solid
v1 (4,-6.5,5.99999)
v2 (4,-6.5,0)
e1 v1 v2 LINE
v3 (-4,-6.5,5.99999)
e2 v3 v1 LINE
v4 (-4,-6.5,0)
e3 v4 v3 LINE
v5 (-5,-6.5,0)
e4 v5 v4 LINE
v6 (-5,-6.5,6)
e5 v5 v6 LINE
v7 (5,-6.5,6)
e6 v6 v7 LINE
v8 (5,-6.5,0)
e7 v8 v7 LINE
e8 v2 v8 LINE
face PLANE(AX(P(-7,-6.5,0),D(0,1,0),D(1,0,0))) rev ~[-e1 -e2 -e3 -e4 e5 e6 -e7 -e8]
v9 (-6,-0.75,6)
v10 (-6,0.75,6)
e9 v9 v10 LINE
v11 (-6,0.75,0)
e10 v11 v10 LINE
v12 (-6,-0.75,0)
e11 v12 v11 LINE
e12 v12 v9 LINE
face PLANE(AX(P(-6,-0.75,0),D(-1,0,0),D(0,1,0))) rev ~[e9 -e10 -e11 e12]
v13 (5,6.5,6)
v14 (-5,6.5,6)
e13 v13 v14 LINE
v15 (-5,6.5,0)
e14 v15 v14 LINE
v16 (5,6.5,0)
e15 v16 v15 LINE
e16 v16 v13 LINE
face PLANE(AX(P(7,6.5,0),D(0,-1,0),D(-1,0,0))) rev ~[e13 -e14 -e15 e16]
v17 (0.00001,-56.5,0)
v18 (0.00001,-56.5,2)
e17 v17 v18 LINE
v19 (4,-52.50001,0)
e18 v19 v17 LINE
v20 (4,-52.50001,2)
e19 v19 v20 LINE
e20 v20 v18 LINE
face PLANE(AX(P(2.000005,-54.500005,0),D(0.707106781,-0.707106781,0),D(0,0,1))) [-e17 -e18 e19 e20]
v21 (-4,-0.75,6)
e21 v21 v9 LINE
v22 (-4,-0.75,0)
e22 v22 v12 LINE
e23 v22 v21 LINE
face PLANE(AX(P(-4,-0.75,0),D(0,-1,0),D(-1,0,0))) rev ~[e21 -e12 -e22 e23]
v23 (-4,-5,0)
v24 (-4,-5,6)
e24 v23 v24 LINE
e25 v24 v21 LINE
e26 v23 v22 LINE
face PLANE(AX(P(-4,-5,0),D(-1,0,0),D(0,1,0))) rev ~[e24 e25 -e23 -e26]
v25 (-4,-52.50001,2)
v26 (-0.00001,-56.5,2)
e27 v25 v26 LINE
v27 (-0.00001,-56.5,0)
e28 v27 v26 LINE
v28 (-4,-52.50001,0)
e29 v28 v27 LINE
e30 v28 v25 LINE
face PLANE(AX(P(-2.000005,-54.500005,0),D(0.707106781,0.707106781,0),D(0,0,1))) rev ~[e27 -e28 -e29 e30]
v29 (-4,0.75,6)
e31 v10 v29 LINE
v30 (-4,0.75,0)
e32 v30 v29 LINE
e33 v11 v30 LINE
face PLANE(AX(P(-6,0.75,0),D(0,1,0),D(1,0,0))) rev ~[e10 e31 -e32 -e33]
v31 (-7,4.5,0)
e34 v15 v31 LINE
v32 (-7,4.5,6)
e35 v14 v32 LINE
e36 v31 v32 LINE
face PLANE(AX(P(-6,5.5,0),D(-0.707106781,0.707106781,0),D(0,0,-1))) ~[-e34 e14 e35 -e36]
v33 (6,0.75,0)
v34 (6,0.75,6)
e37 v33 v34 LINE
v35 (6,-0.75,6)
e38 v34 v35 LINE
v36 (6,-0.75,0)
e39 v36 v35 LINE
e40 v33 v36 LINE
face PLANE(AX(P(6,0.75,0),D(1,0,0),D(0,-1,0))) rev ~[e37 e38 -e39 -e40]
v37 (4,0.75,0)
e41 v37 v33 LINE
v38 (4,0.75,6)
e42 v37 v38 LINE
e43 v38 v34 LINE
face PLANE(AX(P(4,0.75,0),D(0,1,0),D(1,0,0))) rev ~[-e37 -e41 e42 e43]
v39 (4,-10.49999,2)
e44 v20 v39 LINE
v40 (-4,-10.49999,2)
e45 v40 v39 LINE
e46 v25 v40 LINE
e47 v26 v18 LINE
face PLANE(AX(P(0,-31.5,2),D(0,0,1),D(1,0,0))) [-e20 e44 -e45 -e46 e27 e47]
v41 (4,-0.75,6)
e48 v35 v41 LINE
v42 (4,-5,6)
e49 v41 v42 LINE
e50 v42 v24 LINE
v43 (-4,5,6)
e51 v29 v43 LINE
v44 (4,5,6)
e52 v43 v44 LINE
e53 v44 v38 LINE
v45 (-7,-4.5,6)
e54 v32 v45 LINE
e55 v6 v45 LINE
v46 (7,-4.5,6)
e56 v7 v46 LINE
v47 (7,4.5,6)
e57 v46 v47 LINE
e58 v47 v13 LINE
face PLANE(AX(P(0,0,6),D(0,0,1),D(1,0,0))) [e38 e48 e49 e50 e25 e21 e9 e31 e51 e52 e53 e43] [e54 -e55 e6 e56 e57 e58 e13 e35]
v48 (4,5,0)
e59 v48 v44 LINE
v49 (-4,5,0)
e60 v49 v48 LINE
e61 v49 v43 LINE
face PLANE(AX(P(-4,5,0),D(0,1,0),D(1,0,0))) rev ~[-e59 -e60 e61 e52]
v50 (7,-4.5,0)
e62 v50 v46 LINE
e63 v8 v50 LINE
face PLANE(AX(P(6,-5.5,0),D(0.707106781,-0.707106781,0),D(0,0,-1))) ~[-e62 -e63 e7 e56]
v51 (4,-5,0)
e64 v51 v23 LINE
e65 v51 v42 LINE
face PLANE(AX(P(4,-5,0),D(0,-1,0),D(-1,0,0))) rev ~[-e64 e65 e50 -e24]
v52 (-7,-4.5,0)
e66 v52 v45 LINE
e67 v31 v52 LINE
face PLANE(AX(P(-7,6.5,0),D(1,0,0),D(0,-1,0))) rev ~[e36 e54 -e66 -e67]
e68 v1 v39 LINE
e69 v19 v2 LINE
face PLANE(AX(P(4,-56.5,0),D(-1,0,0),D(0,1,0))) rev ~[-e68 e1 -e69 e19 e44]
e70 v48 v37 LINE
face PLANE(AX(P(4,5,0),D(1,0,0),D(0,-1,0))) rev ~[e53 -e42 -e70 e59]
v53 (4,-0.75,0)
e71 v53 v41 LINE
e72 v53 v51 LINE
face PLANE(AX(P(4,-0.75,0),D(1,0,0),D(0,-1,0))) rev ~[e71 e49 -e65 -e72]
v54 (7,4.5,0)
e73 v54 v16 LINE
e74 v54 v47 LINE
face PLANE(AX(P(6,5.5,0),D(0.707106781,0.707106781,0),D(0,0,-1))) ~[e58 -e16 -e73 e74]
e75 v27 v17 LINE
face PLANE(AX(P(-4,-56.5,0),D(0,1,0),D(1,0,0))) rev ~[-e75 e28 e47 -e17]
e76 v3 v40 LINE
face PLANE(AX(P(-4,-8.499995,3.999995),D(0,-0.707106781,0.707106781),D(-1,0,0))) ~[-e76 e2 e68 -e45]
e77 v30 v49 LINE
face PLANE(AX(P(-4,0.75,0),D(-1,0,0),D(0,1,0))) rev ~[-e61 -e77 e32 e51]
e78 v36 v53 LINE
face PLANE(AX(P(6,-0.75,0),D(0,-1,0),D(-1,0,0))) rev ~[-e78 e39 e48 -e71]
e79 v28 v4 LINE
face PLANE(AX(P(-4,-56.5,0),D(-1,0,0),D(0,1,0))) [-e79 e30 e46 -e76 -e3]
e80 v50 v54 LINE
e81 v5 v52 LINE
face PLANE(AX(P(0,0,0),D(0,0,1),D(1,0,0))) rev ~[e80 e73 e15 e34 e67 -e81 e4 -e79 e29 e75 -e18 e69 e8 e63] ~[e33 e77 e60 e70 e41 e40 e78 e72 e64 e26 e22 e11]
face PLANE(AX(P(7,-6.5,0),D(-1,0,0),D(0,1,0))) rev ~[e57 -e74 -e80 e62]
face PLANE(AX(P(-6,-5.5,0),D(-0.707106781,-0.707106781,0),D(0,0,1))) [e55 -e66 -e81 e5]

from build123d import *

# Parameters (mm, degrees)
F1_DEPTH = 6
F0_W     = 8
F0_H     = 50
F2_DEPTH = 2
F3_SIZE  = 3.99999
F4_SIZE  = 2


# Not quite as in the source:
# - a fillet or chamfer is up to 0.001 mm smaller than in the source, because OpenCascade refuses the exact size


with BuildPart() as f1:
    # F0 (on Top) → F1 (new body)
    with BuildSketch(Plane.XY):
        Polygon((4, -6.5), (7, -6.5), (7, 6.5), (-7, 6.5), (-7, -6.5), (-4, -6.5), align=None)
        Polygon((4, -0.75), (4, -5), (-4, -5), (-4, -0.75), (-6, -0.75), (-6, 0.75), (-4, 0.75), (-4, 5), (4, 5), (4, 0.75), (6, 0.75), (6, -0.75), align=None, mode=Mode.SUBTRACT)
    extrude(amount=F1_DEPTH)

    # F0 (on Top) → F2 (join)
    with BuildSketch(Plane.XY):
        with Locations((0, -31.5)):
            Rectangle(F0_W, F0_H)
    extrude(amount=F2_DEPTH)

    # F3 (size 4 in the source; OpenCascade refuses exactly that, so slightly less here)
    f3_edges = [f1.edges().sort_by_distance(p)[0] for p in [
        (0, -6.5, 2),
        (-4, -56.5, 1),
        (4, -56.5, 1),
    ]]
    chamfer(f3_edges, length=F3_SIZE)

    # F4
    f4_edges = [f1.edges().sort_by_distance(p)[0] for p in [
        (-7, -6.5, 3),
        (-7, 6.5, 3),
        (7, -6.5, 3),
        (7, 6.5, 3),
    ]]
    chamfer(f4_edges, length=F4_SIZE)


solid = f1.part
